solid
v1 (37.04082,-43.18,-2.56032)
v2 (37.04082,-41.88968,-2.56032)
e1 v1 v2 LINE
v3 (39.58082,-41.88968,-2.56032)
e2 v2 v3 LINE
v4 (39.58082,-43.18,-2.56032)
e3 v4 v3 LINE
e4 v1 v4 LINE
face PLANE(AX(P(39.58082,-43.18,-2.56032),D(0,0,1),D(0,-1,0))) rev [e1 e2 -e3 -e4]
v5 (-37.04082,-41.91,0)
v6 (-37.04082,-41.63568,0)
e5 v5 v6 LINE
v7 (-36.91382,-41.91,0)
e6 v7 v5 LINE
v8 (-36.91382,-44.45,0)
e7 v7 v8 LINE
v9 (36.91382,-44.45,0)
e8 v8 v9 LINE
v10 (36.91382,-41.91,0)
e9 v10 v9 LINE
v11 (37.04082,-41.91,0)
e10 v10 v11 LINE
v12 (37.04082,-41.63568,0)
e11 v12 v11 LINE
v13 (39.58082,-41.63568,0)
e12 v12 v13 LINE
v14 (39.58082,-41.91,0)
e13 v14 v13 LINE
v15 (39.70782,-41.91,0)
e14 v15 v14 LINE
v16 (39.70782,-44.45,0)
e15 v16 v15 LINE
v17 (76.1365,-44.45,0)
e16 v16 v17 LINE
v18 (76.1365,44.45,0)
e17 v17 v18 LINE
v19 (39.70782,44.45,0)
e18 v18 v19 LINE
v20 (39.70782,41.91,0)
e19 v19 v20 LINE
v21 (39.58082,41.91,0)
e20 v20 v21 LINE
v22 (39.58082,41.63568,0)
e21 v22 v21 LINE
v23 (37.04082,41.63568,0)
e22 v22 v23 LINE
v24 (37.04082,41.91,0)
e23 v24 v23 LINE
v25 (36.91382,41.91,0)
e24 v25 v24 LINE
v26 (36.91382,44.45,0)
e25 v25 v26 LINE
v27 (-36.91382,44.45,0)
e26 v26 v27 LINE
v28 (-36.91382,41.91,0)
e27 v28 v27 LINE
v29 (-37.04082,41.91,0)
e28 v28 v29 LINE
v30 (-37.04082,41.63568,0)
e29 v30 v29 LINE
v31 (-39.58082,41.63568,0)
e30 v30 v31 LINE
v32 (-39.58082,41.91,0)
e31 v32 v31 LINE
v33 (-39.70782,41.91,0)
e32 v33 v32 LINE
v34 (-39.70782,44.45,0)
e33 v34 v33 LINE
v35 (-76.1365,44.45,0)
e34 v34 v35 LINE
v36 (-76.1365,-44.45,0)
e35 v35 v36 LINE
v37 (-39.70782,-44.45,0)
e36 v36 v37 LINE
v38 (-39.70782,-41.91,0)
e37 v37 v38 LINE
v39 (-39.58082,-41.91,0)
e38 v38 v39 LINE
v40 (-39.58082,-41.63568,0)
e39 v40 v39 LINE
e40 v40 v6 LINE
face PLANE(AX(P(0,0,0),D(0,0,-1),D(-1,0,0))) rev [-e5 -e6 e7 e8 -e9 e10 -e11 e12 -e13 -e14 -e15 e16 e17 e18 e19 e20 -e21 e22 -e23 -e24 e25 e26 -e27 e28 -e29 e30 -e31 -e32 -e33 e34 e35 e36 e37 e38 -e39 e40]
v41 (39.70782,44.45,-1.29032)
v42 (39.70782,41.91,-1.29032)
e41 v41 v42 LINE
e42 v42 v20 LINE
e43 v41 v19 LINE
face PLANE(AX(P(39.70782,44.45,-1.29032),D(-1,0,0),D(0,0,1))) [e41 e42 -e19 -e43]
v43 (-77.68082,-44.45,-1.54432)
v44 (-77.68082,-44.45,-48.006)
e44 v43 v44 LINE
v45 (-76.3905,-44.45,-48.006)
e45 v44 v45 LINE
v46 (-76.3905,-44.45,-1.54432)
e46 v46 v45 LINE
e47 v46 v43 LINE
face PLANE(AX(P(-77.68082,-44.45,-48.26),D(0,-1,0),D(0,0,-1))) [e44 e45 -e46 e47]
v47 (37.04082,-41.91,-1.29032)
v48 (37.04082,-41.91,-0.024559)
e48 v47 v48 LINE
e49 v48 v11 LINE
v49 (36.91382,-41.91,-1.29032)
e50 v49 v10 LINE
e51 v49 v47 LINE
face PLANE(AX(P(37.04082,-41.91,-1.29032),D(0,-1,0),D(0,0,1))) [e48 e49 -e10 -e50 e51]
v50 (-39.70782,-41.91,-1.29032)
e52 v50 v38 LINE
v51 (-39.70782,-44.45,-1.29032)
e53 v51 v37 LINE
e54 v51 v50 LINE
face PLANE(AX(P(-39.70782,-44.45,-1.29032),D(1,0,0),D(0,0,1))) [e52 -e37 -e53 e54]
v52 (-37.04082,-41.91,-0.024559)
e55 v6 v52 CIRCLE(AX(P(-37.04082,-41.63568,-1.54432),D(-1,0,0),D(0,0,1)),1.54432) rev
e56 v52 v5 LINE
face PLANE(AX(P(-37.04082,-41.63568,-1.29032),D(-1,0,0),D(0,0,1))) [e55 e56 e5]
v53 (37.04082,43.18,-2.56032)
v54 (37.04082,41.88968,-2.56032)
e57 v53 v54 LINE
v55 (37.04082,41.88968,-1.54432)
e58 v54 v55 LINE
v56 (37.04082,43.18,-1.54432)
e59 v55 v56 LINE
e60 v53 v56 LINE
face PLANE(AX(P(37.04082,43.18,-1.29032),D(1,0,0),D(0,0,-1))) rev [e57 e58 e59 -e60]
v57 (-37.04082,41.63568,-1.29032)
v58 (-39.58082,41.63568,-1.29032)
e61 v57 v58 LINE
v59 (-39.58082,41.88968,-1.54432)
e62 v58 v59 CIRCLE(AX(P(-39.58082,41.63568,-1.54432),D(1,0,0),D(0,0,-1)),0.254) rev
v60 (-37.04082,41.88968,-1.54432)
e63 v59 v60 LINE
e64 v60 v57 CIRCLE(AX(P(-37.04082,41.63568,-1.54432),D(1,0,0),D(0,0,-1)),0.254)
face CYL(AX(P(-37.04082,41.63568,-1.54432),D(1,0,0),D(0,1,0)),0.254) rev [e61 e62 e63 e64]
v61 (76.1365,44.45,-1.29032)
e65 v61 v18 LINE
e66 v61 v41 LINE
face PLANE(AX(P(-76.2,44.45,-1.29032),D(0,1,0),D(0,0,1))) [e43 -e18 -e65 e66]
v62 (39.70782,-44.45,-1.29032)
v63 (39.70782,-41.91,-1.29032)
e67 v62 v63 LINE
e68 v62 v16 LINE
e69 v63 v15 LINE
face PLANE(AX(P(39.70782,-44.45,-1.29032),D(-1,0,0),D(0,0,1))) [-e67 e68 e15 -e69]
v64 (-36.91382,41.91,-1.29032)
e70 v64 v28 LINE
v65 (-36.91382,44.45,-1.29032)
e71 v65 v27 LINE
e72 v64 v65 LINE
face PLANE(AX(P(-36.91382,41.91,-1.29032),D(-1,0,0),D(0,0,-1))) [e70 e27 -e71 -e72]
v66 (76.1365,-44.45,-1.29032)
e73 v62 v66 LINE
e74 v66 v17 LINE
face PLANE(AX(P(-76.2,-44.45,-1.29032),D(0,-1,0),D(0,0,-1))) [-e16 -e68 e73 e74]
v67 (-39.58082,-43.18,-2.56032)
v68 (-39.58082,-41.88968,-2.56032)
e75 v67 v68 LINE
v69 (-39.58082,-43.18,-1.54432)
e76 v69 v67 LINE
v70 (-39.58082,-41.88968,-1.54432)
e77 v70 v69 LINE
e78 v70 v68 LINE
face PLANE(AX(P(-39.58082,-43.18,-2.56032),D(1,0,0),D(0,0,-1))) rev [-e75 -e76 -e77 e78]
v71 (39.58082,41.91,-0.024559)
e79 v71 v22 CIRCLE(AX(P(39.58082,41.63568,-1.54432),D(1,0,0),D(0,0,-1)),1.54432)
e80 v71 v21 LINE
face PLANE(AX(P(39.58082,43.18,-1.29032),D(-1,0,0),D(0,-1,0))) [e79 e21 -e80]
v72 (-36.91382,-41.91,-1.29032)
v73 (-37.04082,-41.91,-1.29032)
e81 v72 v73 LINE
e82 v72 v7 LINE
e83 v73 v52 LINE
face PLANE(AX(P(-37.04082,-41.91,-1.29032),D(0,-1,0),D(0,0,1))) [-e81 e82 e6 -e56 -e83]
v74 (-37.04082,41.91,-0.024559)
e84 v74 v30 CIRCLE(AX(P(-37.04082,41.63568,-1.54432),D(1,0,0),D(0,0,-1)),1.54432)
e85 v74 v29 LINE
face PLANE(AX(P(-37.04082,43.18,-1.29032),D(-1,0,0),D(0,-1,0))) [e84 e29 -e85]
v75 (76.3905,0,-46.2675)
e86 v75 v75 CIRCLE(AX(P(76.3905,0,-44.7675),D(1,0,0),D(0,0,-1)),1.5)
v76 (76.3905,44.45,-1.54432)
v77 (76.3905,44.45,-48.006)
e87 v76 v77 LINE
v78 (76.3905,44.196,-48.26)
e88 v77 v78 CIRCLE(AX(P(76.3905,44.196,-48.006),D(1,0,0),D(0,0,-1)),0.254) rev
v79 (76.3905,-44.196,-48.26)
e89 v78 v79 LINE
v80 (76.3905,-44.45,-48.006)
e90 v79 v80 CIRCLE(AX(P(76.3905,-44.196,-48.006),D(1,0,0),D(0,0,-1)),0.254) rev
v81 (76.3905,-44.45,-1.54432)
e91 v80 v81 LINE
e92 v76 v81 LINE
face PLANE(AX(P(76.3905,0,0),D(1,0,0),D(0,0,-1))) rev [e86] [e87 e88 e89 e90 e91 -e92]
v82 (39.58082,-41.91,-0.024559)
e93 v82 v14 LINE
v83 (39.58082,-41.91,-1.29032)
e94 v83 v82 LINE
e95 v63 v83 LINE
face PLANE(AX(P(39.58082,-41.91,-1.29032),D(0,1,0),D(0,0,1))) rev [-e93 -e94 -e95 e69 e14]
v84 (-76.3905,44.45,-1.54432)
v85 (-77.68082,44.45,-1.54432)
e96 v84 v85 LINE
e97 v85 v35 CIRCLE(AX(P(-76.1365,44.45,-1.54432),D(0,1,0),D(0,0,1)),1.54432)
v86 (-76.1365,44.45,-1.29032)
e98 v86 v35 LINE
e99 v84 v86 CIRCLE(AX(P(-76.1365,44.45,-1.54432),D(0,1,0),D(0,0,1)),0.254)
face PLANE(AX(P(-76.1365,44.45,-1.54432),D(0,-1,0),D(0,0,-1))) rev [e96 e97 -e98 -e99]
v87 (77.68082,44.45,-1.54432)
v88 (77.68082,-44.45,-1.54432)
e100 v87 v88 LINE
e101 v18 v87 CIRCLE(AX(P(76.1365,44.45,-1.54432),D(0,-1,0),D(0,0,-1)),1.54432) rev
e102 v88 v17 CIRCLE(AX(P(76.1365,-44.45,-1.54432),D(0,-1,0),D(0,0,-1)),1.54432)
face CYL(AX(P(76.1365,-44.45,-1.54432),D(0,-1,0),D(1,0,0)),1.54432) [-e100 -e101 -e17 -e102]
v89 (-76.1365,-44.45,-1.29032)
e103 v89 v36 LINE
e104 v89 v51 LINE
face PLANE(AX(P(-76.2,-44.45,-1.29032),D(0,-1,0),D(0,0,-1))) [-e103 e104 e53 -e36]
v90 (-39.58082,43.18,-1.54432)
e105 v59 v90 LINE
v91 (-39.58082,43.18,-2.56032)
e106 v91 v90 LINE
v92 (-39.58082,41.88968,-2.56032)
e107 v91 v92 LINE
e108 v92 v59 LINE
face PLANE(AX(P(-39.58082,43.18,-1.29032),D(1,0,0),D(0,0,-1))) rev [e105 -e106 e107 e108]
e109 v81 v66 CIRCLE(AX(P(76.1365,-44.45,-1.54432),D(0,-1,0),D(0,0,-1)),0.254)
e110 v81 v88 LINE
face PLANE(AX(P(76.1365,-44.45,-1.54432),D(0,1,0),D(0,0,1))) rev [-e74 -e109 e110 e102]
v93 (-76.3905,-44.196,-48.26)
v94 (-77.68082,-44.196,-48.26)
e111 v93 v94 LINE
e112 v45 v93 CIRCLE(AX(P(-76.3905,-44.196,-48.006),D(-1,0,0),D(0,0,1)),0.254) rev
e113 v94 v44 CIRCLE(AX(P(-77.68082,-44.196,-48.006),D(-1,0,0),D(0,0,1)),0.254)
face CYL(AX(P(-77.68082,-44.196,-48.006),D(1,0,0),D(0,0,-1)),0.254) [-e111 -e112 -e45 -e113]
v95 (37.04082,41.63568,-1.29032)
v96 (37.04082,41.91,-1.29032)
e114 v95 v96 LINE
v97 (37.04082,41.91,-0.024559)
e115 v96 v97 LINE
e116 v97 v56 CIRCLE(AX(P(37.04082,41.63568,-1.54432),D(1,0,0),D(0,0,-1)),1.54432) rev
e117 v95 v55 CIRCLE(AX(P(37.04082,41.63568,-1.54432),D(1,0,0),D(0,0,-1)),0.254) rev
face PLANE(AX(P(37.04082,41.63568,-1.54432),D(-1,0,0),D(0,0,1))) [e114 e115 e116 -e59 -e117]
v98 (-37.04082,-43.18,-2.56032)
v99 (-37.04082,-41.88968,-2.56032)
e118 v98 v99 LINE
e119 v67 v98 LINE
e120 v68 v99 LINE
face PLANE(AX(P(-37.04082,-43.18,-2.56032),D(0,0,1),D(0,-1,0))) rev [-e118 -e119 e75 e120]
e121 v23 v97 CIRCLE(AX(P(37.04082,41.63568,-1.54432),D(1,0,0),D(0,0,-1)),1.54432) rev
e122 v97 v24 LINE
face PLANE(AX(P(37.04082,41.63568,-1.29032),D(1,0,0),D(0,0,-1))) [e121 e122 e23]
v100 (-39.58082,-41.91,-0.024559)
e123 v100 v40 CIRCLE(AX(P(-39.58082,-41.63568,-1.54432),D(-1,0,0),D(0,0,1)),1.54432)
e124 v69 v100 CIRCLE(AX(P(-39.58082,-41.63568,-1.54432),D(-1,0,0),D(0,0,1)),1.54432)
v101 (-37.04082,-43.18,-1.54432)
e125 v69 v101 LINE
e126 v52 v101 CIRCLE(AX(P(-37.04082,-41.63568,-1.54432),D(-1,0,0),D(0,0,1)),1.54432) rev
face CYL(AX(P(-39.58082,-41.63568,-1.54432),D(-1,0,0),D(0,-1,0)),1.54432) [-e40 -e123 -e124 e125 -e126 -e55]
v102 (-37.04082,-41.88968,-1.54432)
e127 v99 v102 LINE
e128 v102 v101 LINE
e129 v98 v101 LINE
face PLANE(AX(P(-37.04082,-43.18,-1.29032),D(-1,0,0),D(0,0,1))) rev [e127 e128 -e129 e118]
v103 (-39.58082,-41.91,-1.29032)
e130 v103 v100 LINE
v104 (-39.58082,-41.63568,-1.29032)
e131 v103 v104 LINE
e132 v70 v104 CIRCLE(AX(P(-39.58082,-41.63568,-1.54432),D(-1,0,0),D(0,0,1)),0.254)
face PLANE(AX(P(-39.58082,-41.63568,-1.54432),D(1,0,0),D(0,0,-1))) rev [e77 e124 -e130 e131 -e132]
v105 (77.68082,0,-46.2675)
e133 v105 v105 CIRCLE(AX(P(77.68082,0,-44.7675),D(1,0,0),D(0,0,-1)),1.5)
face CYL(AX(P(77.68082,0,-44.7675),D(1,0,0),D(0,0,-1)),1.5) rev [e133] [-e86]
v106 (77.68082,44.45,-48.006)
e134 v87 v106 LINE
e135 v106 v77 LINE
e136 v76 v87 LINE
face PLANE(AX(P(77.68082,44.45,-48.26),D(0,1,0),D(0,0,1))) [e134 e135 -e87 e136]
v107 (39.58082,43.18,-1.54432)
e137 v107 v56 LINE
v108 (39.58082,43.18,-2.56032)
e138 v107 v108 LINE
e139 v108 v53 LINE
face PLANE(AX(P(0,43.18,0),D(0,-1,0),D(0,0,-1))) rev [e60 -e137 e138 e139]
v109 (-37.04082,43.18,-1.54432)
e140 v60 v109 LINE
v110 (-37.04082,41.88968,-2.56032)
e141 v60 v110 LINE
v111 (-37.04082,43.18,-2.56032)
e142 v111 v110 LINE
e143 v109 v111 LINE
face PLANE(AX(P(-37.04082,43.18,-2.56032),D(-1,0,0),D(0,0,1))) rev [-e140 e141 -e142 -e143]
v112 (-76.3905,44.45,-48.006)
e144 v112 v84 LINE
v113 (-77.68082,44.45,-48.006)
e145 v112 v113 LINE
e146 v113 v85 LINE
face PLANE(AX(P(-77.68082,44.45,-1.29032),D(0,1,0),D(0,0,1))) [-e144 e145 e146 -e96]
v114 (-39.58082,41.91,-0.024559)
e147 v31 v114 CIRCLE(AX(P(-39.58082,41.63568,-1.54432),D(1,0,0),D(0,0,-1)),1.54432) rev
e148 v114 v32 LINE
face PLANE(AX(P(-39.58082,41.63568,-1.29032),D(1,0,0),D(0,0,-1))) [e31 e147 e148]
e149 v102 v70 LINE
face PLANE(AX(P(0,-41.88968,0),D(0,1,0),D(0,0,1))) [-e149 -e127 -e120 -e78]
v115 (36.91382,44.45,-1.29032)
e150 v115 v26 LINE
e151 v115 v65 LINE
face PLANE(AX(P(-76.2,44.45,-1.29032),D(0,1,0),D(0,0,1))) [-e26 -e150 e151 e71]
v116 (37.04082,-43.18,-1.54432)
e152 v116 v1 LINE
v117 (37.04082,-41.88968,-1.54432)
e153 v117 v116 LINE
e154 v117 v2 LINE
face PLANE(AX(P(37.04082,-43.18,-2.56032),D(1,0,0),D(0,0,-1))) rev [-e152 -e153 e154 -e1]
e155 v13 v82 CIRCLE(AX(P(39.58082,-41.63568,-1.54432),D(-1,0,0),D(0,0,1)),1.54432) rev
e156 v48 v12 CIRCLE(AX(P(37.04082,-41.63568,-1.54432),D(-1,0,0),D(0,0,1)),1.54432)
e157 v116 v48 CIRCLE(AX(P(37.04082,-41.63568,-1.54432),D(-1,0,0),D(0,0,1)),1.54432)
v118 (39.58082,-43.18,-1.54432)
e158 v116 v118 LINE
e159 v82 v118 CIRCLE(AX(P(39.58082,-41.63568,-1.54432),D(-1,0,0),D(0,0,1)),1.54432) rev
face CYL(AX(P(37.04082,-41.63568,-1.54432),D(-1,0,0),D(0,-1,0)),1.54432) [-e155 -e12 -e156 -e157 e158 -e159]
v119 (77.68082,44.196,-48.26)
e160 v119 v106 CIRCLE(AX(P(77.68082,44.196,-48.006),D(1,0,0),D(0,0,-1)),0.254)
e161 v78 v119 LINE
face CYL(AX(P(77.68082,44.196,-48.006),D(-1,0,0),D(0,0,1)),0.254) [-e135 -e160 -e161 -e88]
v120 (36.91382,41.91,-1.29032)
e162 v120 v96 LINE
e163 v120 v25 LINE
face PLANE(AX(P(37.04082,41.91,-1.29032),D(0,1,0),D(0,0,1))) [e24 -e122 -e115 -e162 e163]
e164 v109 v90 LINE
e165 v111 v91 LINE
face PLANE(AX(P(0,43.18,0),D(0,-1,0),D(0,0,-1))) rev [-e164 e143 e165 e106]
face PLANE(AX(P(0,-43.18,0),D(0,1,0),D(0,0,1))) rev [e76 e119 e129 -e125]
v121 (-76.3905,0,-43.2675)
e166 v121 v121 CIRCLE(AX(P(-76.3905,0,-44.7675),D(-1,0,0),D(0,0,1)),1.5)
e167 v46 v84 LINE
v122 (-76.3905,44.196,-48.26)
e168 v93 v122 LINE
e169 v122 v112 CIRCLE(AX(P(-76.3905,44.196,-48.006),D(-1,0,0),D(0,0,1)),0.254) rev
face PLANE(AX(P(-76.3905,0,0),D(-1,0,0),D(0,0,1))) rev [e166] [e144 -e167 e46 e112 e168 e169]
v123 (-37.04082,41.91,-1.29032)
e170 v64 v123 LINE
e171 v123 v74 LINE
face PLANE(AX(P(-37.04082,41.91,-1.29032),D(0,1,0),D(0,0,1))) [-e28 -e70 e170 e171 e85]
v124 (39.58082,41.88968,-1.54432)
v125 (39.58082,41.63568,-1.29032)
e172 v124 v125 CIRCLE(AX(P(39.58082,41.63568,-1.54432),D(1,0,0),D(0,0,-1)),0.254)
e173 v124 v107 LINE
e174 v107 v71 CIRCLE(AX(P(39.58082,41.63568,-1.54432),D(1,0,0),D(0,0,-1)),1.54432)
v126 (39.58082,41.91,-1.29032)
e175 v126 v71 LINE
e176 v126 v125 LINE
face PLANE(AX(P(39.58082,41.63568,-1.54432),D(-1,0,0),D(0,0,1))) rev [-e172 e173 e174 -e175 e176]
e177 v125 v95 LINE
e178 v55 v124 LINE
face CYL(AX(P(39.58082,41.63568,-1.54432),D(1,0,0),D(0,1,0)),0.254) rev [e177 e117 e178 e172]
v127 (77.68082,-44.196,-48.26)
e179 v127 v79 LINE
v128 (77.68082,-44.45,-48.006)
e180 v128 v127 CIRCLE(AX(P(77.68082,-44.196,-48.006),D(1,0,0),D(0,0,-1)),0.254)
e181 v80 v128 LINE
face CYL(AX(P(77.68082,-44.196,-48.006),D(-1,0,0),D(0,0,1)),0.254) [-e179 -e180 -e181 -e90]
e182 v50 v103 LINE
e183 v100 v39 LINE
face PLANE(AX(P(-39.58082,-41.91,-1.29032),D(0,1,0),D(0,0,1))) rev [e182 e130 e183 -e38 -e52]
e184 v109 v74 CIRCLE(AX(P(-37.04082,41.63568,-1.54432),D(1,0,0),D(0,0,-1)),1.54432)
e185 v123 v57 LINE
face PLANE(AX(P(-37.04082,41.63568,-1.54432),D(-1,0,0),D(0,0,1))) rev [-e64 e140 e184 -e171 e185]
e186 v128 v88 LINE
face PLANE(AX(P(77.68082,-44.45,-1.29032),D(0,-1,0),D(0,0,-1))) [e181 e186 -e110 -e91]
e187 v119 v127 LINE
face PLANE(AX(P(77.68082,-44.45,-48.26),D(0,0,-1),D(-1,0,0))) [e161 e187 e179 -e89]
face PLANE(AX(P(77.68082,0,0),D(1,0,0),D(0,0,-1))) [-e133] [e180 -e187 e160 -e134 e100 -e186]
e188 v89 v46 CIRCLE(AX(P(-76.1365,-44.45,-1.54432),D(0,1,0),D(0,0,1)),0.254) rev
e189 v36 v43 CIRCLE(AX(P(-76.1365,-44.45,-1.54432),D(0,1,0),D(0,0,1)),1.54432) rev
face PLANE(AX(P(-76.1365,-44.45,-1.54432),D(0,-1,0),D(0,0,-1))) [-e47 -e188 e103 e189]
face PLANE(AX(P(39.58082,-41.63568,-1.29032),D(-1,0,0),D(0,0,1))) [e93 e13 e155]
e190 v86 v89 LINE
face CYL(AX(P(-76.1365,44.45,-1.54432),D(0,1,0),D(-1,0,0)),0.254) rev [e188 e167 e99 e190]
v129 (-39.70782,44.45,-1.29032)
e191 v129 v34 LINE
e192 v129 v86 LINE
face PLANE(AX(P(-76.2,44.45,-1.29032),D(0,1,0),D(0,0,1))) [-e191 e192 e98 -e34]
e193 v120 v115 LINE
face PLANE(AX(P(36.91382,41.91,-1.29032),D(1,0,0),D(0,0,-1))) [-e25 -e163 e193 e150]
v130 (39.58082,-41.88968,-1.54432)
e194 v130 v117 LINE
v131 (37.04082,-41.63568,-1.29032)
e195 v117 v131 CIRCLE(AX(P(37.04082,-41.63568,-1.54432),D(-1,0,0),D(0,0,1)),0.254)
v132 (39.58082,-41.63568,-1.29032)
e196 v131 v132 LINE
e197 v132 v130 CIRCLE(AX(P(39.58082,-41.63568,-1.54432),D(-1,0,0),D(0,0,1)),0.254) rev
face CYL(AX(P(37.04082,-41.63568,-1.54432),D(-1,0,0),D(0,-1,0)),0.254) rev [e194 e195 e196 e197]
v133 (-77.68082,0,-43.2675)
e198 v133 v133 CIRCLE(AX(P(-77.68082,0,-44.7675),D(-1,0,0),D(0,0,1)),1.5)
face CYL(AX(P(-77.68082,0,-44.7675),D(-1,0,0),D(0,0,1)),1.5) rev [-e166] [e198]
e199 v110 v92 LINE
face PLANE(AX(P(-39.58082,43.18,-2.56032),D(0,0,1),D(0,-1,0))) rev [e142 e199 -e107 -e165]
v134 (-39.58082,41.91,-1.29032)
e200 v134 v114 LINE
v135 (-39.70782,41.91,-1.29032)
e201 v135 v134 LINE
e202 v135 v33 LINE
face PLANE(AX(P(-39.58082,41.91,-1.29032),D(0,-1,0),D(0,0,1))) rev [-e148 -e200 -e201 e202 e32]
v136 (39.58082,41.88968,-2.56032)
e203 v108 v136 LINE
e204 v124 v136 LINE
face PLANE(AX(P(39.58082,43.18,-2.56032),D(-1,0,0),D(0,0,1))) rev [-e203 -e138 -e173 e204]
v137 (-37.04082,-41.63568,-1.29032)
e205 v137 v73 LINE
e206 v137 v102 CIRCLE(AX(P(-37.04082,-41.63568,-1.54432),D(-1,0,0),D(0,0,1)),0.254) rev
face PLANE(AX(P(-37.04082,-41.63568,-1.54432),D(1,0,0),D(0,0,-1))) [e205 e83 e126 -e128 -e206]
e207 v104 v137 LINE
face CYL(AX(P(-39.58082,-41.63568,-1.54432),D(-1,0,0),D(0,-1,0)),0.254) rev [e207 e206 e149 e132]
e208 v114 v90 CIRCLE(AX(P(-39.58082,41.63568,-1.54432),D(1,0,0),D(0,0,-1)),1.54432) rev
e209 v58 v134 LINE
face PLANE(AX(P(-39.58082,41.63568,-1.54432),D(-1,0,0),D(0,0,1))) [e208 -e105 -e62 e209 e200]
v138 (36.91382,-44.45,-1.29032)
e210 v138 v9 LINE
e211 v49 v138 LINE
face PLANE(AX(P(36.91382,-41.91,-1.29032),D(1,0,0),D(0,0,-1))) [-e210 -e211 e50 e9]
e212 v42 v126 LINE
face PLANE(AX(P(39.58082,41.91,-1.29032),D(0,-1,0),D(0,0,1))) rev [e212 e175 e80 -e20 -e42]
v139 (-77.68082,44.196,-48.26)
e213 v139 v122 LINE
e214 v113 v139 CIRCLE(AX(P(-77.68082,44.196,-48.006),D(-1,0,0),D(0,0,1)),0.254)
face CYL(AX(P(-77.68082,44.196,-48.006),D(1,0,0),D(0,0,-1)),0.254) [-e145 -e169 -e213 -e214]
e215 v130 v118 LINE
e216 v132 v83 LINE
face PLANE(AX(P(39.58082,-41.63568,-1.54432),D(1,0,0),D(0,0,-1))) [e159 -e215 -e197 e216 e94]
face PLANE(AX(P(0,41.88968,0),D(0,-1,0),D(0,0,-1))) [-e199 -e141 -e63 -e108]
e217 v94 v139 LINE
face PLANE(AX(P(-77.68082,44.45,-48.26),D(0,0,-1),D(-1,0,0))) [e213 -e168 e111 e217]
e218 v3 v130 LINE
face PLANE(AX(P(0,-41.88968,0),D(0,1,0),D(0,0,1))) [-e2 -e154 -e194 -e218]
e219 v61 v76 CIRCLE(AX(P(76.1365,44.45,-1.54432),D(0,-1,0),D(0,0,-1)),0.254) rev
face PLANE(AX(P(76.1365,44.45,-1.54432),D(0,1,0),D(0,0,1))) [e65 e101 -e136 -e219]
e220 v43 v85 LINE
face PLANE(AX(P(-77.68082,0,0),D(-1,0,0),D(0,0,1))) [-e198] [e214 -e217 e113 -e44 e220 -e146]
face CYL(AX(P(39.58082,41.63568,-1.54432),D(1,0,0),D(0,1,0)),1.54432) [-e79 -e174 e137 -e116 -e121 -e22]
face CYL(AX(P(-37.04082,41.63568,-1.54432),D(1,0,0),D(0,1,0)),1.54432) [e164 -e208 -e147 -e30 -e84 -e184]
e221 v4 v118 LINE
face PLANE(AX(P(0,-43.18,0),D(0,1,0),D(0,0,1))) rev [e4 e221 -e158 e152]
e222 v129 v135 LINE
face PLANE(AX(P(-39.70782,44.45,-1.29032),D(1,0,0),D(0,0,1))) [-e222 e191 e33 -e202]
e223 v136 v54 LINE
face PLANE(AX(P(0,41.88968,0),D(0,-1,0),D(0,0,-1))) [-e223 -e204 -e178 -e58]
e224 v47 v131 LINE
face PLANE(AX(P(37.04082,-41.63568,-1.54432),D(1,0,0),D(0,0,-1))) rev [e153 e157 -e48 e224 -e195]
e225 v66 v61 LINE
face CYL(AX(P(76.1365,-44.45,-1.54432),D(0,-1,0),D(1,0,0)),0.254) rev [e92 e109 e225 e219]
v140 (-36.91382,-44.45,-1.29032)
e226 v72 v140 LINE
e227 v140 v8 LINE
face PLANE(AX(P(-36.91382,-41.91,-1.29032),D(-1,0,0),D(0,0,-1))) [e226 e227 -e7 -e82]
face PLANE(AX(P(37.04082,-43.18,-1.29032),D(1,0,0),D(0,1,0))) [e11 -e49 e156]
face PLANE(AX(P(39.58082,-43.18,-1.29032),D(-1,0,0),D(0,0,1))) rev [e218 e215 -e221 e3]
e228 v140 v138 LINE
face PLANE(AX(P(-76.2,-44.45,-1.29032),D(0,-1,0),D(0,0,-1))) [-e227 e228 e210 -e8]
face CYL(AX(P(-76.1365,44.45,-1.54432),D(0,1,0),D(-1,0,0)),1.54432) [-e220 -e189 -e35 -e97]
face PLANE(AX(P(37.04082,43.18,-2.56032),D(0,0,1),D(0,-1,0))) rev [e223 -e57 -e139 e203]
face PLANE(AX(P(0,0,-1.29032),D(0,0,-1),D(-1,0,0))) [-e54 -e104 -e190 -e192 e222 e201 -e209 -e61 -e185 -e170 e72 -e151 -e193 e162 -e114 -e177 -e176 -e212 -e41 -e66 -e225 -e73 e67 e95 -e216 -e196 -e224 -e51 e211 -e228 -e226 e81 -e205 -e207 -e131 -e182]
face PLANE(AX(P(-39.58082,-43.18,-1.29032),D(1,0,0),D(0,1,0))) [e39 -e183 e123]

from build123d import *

# Parameters (mm, degrees)
SKETCH1_W                      = 152.4
SKETCH1_H                      = 88.9
BASE_FLANGE1_DEPTH             = 1.29032
EDGE_FLANGE1_STRIP_W           = 5.85978
EDGE_FLANGE1_STRIP_H           = 1.29032
EDGE_FLANGE1_STRIP_CUT_DEPTH   = 88.9
EDGE_FLANGE1_STRIP_2_W         = 5.85978
EDGE_FLANGE1_STRIP_2_H         = 1.29032
EDGE_FLANGE1_STRIP_CUT_2_DEPTH = 88.9
EDGE_FLANGE1_DEPTH             = 88.9
EDGE_FLANGE1_BEND_DEPTH        = 88.9
M3X0_5_TAPPED_HOLE1_REACH      = 170.648
M3X0_5_TAPPED_HOLE1_BORE_R     = 1.5
BREAK_CORNER1_START            = -77.68082
BREAK_CORNER1_DEPTH            = 155.36164
CUT_THICKEN1_START             = 41.91
CUT_THICKEN1_OUTLINE_W         = 0.127
CUT_THICKEN1_OUTLINE_H         = 1.29032
CUT_THICKEN1_DEPTH             = 2.54
CUT_THICKEN2_START             = 41.91
CUT_THICKEN2_OUTLINE_W         = 0.127
CUT_THICKEN2_OUTLINE_H         = 1.29032
CUT_THICKEN2_DEPTH             = 2.54
MIRROR7_START                  = 41.91
MIRROR7_COPY_1_SKETCH_W        = 0.127
MIRROR7_COPY_1_SKETCH_H        = 1.29032
MIRROR7_COPY_1_DEPTH           = 2.54
MIRROR7_COPY_2_SKETCH_W        = 0.127
MIRROR7_COPY_2_SKETCH_H        = 1.29032
MIRROR7_COPY_2_DEPTH           = 2.54
MOVE_FACE1_BY                  = 1.27
MOVE_FACE1_2_BY                = 1.27
MOVE_FACE1_3_BY                = 1.27
MOVE_FACE1_4_BY                = 1.27
EDGE_FLANGE2_STRIP_W           = 5.66928
EDGE_FLANGE2_STRIP_H           = 1.29032
EDGE_FLANGE2_STRIP_CUT_DEPTH   = 2.54
EDGE_FLANGE2_STRIP_2_W         = 5.66928
EDGE_FLANGE2_STRIP_2_H         = 1.29032
EDGE_FLANGE2_STRIP_CUT_2_DEPTH = 2.54
EDGE_FLANGE2_STRIP_3_W         = 5.66928
EDGE_FLANGE2_STRIP_3_H         = 1.29032
EDGE_FLANGE2_STRIP_CUT_3_DEPTH = 2.54
EDGE_FLANGE2_STRIP_4_W         = 5.66928
EDGE_FLANGE2_STRIP_4_H         = 1.29032
EDGE_FLANGE2_STRIP_CUT_4_DEPTH = 2.54
EDGE_FLANGE2_DEPTH             = 2.54
EDGE_FLANGE2_BEND_DEPTH        = 2.54
EDGE_FLANGE2_BEND_2_DEPTH      = 2.54
EDGE_FLANGE2_BEND_3_DEPTH      = 2.54


# Read off the part's stored shape, not the designer's step: Break-Corner1, Cut-Thicken1, Cut-Thicken2
# Sheet-metal steps are written as plain solids
with BuildPart() as part:
    # Sketch1 → Base-Flange1 (new body)
    with BuildSketch(Plane.XY):
        Rectangle(SKETCH1_W, SKETCH1_H)
    extrude(amount=-BASE_FLANGE1_DEPTH)

    # Edge-Flange1 strip (across the edge) → Edge-Flange1 strip cut (cut)
    with BuildSketch(Plane(origin=(-76.3905, -44.45, -1.29032), x_dir=(1, 0, 0), z_dir=(0, 1, 0))):
        with Locations((-2.67589, -0.64516)):
            Rectangle(EDGE_FLANGE1_STRIP_W, EDGE_FLANGE1_STRIP_H)
    extrude(amount=EDGE_FLANGE1_STRIP_CUT_DEPTH, mode=Mode.SUBTRACT)

    # Edge-Flange1 strip 2 (across the edge) → Edge-Flange1 strip cut 2 (cut)
    with BuildSketch(Plane(origin=(76.3905, 44.45, -1.29032), x_dir=(-1, 0, 0), z_dir=(0, -1, 0))):
        with Locations((-2.67589, -0.64516)):
            Rectangle(EDGE_FLANGE1_STRIP_2_W, EDGE_FLANGE1_STRIP_2_H)
    extrude(amount=EDGE_FLANGE1_STRIP_CUT_2_DEPTH, mode=Mode.SUBTRACT)

    # Edge-Flange1 section (across the edge) → Edge-Flange1 (add)
    with BuildSketch(Plane(origin=(-76.3905, -44.45, -1.29032), x_dir=(1, 0, 0), z_dir=(0, 1, 0))):
        with BuildLine():
            Line((-1.29032, 0.254), (-1.29032, 46.96968))
            Line((-1.29032, 46.96968), (0, 46.96968))
            Line((0, 46.96968), (0, 0.254))
            ThreePointArc((0, 0.254), (0.074394878, 0.074394878), (0.254, 0))
            Line((0.254, 0), (0.254, -1.29032))
            ThreePointArc((0.254, -1.29032), (-0.837999144, -0.837999144), (-1.29032, 0.254))
        make_face()
    extrude(amount=EDGE_FLANGE1_DEPTH)

    # Edge-Flange1 section 2 (across the edge) → Edge-Flange1 bend (add)
    with BuildSketch(Plane(origin=(76.3905, 44.45, -1.29032), x_dir=(-1, 0, 0), z_dir=(0, -1, 0))):
        with BuildLine():
            Line((-1.29032, 0.254), (-1.29032, 46.96968))
            Line((-1.29032, 46.96968), (0, 46.96968))
            Line((0, 46.96968), (0, 0.254))
            ThreePointArc((0, 0.254), (0.074394878, 0.074394878), (0.254, 0))
            Line((0.254, 0), (0.254, -1.29032))
            ThreePointArc((0.254, -1.29032), (-0.837999144, -0.837999144), (-1.29032, 0.254))
        make_face()
    extrude(amount=EDGE_FLANGE1_BEND_DEPTH)

    # M3x0.5 Tapped Hole1 bore → M3x0.5 Tapped Hole1 (cut, up to next)
    with BuildSketch(Plane.ZY.offset(77.68082), mode=Mode.PRIVATE) as m3x0_5_tapped_hole1_sk1:
        with Locations((-44.7675, 0)):
            Circle(M3X0_5_TAPPED_HOLE1_BORE_R)
    m3x0_5_tapped_hole1_tool1 = extrude(m3x0_5_tapped_hole1_sk1.sketch, amount=-M3X0_5_TAPPED_HOLE1_REACH, mode=Mode.PRIVATE) & part.part
    m3x0_5_tapped_hole1 = m3x0_5_tapped_hole1_tool1.solids().sort_by_distance((-77.68082, 0, -44.7675))[0]
    add(m3x0_5_tapped_hole1, mode=Mode.SUBTRACT)

    # Mirror1: M3x0.5 Tapped Hole1 across plane
    add(m3x0_5_tapped_hole1.mirror(Plane(origin=(0, 0, 0), x_dir=(0, 0, 1), z_dir=(1, 0, 0))), mode=Mode.SUBTRACT)

    # Break-Corner1 outline → Break-Corner1 (cut)
    with BuildSketch(Plane.YZ.offset(BREAK_CORNER1_START)):
        with BuildLine():
            Line((44.45, -48.26), (44.45, -48.006))
            ThreePointArc((44.45, -48.006), (44.375605122, -48.185605122), (44.196, -48.26))
            Line((44.196, -48.26), (44.45, -48.26))
        make_face()
        with BuildLine():
            Line((-44.45, -48.26), (-44.196, -48.26))
            ThreePointArc((-44.196, -48.26), (-44.375605122, -48.185605122), (-44.45, -48.006))
            Line((-44.45, -48.006), (-44.45, -48.26))
        make_face()
    extrude(amount=BREAK_CORNER1_DEPTH, mode=Mode.SUBTRACT)

    # Cut-Thicken1 outline → Cut-Thicken1 (cut)
    with BuildSketch(Plane(origin=(0, 0, 0), x_dir=(1, 0, 0), z_dir=(0, 1, 0)).offset(CUT_THICKEN1_START)):
        with Locations((36.97732, 0.64516)):
            Rectangle(CUT_THICKEN1_OUTLINE_W, CUT_THICKEN1_OUTLINE_H)
    cut_thicken1 = extrude(amount=CUT_THICKEN1_DEPTH, mode=Mode.SUBTRACT)

    # Cut-Thicken2 outline → Cut-Thicken2 (cut)
    with BuildSketch(Plane(origin=(0, 0, 0), x_dir=(1, 0, 0), z_dir=(0, 1, 0)).offset(CUT_THICKEN2_START)):
        with Locations((39.64432, 0.64516)):
            Rectangle(CUT_THICKEN2_OUTLINE_W, CUT_THICKEN2_OUTLINE_H)
    cut_thicken2 = extrude(amount=CUT_THICKEN2_DEPTH, mode=Mode.SUBTRACT)

    # Mirror6: Cut-Thicken1, Cut-Thicken2 across plane
    add(cut_thicken1.mirror(Plane(origin=(0, 0, 0), x_dir=(0, 0, 1), z_dir=(1, 0, 0))), mode=Mode.SUBTRACT)
    add(cut_thicken2.mirror(Plane(origin=(0, 0, 0), x_dir=(0, 0, 1), z_dir=(1, 0, 0))), mode=Mode.SUBTRACT)

    # Mirror7: Cut-Thicken1, Cut-Thicken2 across plane
    add(cut_thicken1.mirror(Plane.ZX), mode=Mode.SUBTRACT)
    add(cut_thicken2.mirror(Plane.ZX), mode=Mode.SUBTRACT)

    # Mirror7 copy 1 sketch → Mirror7 copy 1 (cut)
    with BuildSketch(Plane(origin=(0, 0, 0), x_dir=(-1, 0, 0), z_dir=(0, -1, 0)).offset(MIRROR7_START)):
        with Locations((36.97732, 0.64516)):
            Rectangle(MIRROR7_COPY_1_SKETCH_W, MIRROR7_COPY_1_SKETCH_H)
    extrude(amount=MIRROR7_COPY_1_DEPTH, mode=Mode.SUBTRACT)

    # Mirror7 copy 2 sketch → Mirror7 copy 2 (cut)
    with BuildSketch(Plane(origin=(0, 0, 0), x_dir=(-1, 0, 0), z_dir=(0, -1, 0)).offset(MIRROR7_START)):
        with Locations((39.64432, 0.64516)):
            Rectangle(MIRROR7_COPY_2_SKETCH_W, MIRROR7_COPY_2_SKETCH_H)
    extrude(amount=MIRROR7_COPY_2_DEPTH, mode=Mode.SUBTRACT)

    # Move Face1: a face moved inward by 1.27
    extrude(part.faces().sort_by_distance((-38.31082, -44.45, -0.64516))[0], amount=MOVE_FACE1_BY, dir=(0, 1, 0), mode=Mode.SUBTRACT)

    # Move Face1 2: a face moved inward by 1.27
    extrude(part.faces().sort_by_distance((38.31082, -44.45, -0.64516))[0], amount=MOVE_FACE1_2_BY, dir=(0, 1, 0), mode=Mode.SUBTRACT)

    # Move Face1 3: a face moved inward by 1.27
    extrude(part.faces().sort_by_distance((-38.31082, 44.45, -0.64516))[0], amount=MOVE_FACE1_3_BY, dir=(0, -1, 0), mode=Mode.SUBTRACT)

    # Move Face1 4: a face moved inward by 1.27
    extrude(part.faces().sort_by_distance((38.31082, 44.45, -0.64516))[0], amount=MOVE_FACE1_4_BY, dir=(0, -1, 0), mode=Mode.SUBTRACT)

    # Edge-Flange2 strip (across the edge) → Edge-Flange2 strip cut (cut)
    with BuildSketch(Plane(origin=(37.04082, 43.18, -1.29032), x_dir=(0, -1, 0), z_dir=(1, 0, 0))):
        with Locations((-1.29032, -0.64516)):
            Rectangle(EDGE_FLANGE2_STRIP_W, EDGE_FLANGE2_STRIP_H)
    extrude(amount=EDGE_FLANGE2_STRIP_CUT_DEPTH, mode=Mode.SUBTRACT)

    # Edge-Flange2 strip 2 (across the edge) → Edge-Flange2 strip cut 2 (cut)
    with BuildSketch(Plane(origin=(-39.58082, 43.18, -1.29032), x_dir=(0, -1, 0), z_dir=(1, 0, 0))):
        with Locations((-1.29032, -0.64516)):
            Rectangle(EDGE_FLANGE2_STRIP_2_W, EDGE_FLANGE2_STRIP_2_H)
    extrude(amount=EDGE_FLANGE2_STRIP_CUT_2_DEPTH, mode=Mode.SUBTRACT)

    # Edge-Flange2 strip 3 (across the edge) → Edge-Flange2 strip cut 3 (cut)
    with BuildSketch(Plane(origin=(39.58082, -43.18, -1.29032), x_dir=(0, 1, 0), z_dir=(-1, 0, 0))):
        with Locations((-1.29032, -0.64516)):
            Rectangle(EDGE_FLANGE2_STRIP_3_W, EDGE_FLANGE2_STRIP_3_H)
    extrude(amount=EDGE_FLANGE2_STRIP_CUT_3_DEPTH, mode=Mode.SUBTRACT)

    # Edge-Flange2 strip 4 (across the edge) → Edge-Flange2 strip cut 4 (cut)
    with BuildSketch(Plane(origin=(-37.04082, -43.18, -1.29032), x_dir=(0, 1, 0), z_dir=(-1, 0, 0))):
        with Locations((-1.29032, -0.64516)):
            Rectangle(EDGE_FLANGE2_STRIP_4_W, EDGE_FLANGE2_STRIP_4_H)
    extrude(amount=EDGE_FLANGE2_STRIP_CUT_4_DEPTH, mode=Mode.SUBTRACT)

    # Edge-Flange2 section (across the edge) → Edge-Flange2 (add)
    with BuildSketch(Plane(origin=(37.04082, 43.18, -1.29032), x_dir=(0, -1, 0), z_dir=(1, 0, 0))):
        with BuildLine():
            Line((0, 0.254), (0, 1.27))
            Line((0, 1.27), (1.29032, 1.27))
            Line((1.29032, 1.27), (1.29032, 0.254))
            ThreePointArc((1.29032, 0.254), (1.364714878, 0.074394878), (1.54432, 0))
            Line((1.54432, 0), (1.54432, -1.29032))
            ThreePointArc((1.54432, -1.29032), (0.452320856, -0.837999144), (0, 0.254))
        make_face()
    extrude(amount=EDGE_FLANGE2_DEPTH)

    # Edge-Flange2 section 2 (across the edge) → Edge-Flange2 bend (add)
    with BuildSketch(Plane(origin=(-39.58082, 43.18, -1.29032), x_dir=(0, -1, 0), z_dir=(1, 0, 0))):
        with BuildLine():
            Line((0, 0.254), (0, 1.27))
            Line((0, 1.27), (1.29032, 1.27))
            Line((1.29032, 1.27), (1.29032, 0.254))
            ThreePointArc((1.29032, 0.254), (1.364714878, 0.074394878), (1.54432, 0))
            Line((1.54432, 0), (1.54432, -1.29032))
            ThreePointArc((1.54432, -1.29032), (0.452320856, -0.837999144), (0, 0.254))
        make_face()
    extrude(amount=EDGE_FLANGE2_BEND_DEPTH)

    # Edge-Flange2 section 3 (across the edge) → Edge-Flange2 bend 2 (add)
    with BuildSketch(Plane(origin=(39.58082, -43.18, -1.29032), x_dir=(0, 1, 0), z_dir=(-1, 0, 0))):
        with BuildLine():
            Line((0, 0.254), (0, 1.27))
            Line((0, 1.27), (1.29032, 1.27))
            Line((1.29032, 1.27), (1.29032, 0.254))
            ThreePointArc((1.29032, 0.254), (1.364714878, 0.074394878), (1.54432, 0))
            Line((1.54432, 0), (1.54432, -1.29032))
            ThreePointArc((1.54432, -1.29032), (0.452320856, -0.837999144), (0, 0.254))
        make_face()
    extrude(amount=EDGE_FLANGE2_BEND_2_DEPTH)

    # Edge-Flange2 section 4 (across the edge) → Edge-Flange2 bend 3 (add)
    with BuildSketch(Plane(origin=(-37.04082, -43.18, -1.29032), x_dir=(0, 1, 0), z_dir=(-1, 0, 0))):
        with BuildLine():
            Line((0, 0.254), (0, 1.27))
            Line((0, 1.27), (1.29032, 1.27))
            Line((1.29032, 1.27), (1.29032, 0.254))
            ThreePointArc((1.29032, 0.254), (1.364714878, 0.074394878), (1.54432, 0))
            Line((1.54432, 0), (1.54432, -1.29032))
            ThreePointArc((1.54432, -1.29032), (0.452320856, -0.837999144), (0, 0.254))
        make_face()
    extrude(amount=EDGE_FLANGE2_BEND_3_DEPTH)


solid = part.part
